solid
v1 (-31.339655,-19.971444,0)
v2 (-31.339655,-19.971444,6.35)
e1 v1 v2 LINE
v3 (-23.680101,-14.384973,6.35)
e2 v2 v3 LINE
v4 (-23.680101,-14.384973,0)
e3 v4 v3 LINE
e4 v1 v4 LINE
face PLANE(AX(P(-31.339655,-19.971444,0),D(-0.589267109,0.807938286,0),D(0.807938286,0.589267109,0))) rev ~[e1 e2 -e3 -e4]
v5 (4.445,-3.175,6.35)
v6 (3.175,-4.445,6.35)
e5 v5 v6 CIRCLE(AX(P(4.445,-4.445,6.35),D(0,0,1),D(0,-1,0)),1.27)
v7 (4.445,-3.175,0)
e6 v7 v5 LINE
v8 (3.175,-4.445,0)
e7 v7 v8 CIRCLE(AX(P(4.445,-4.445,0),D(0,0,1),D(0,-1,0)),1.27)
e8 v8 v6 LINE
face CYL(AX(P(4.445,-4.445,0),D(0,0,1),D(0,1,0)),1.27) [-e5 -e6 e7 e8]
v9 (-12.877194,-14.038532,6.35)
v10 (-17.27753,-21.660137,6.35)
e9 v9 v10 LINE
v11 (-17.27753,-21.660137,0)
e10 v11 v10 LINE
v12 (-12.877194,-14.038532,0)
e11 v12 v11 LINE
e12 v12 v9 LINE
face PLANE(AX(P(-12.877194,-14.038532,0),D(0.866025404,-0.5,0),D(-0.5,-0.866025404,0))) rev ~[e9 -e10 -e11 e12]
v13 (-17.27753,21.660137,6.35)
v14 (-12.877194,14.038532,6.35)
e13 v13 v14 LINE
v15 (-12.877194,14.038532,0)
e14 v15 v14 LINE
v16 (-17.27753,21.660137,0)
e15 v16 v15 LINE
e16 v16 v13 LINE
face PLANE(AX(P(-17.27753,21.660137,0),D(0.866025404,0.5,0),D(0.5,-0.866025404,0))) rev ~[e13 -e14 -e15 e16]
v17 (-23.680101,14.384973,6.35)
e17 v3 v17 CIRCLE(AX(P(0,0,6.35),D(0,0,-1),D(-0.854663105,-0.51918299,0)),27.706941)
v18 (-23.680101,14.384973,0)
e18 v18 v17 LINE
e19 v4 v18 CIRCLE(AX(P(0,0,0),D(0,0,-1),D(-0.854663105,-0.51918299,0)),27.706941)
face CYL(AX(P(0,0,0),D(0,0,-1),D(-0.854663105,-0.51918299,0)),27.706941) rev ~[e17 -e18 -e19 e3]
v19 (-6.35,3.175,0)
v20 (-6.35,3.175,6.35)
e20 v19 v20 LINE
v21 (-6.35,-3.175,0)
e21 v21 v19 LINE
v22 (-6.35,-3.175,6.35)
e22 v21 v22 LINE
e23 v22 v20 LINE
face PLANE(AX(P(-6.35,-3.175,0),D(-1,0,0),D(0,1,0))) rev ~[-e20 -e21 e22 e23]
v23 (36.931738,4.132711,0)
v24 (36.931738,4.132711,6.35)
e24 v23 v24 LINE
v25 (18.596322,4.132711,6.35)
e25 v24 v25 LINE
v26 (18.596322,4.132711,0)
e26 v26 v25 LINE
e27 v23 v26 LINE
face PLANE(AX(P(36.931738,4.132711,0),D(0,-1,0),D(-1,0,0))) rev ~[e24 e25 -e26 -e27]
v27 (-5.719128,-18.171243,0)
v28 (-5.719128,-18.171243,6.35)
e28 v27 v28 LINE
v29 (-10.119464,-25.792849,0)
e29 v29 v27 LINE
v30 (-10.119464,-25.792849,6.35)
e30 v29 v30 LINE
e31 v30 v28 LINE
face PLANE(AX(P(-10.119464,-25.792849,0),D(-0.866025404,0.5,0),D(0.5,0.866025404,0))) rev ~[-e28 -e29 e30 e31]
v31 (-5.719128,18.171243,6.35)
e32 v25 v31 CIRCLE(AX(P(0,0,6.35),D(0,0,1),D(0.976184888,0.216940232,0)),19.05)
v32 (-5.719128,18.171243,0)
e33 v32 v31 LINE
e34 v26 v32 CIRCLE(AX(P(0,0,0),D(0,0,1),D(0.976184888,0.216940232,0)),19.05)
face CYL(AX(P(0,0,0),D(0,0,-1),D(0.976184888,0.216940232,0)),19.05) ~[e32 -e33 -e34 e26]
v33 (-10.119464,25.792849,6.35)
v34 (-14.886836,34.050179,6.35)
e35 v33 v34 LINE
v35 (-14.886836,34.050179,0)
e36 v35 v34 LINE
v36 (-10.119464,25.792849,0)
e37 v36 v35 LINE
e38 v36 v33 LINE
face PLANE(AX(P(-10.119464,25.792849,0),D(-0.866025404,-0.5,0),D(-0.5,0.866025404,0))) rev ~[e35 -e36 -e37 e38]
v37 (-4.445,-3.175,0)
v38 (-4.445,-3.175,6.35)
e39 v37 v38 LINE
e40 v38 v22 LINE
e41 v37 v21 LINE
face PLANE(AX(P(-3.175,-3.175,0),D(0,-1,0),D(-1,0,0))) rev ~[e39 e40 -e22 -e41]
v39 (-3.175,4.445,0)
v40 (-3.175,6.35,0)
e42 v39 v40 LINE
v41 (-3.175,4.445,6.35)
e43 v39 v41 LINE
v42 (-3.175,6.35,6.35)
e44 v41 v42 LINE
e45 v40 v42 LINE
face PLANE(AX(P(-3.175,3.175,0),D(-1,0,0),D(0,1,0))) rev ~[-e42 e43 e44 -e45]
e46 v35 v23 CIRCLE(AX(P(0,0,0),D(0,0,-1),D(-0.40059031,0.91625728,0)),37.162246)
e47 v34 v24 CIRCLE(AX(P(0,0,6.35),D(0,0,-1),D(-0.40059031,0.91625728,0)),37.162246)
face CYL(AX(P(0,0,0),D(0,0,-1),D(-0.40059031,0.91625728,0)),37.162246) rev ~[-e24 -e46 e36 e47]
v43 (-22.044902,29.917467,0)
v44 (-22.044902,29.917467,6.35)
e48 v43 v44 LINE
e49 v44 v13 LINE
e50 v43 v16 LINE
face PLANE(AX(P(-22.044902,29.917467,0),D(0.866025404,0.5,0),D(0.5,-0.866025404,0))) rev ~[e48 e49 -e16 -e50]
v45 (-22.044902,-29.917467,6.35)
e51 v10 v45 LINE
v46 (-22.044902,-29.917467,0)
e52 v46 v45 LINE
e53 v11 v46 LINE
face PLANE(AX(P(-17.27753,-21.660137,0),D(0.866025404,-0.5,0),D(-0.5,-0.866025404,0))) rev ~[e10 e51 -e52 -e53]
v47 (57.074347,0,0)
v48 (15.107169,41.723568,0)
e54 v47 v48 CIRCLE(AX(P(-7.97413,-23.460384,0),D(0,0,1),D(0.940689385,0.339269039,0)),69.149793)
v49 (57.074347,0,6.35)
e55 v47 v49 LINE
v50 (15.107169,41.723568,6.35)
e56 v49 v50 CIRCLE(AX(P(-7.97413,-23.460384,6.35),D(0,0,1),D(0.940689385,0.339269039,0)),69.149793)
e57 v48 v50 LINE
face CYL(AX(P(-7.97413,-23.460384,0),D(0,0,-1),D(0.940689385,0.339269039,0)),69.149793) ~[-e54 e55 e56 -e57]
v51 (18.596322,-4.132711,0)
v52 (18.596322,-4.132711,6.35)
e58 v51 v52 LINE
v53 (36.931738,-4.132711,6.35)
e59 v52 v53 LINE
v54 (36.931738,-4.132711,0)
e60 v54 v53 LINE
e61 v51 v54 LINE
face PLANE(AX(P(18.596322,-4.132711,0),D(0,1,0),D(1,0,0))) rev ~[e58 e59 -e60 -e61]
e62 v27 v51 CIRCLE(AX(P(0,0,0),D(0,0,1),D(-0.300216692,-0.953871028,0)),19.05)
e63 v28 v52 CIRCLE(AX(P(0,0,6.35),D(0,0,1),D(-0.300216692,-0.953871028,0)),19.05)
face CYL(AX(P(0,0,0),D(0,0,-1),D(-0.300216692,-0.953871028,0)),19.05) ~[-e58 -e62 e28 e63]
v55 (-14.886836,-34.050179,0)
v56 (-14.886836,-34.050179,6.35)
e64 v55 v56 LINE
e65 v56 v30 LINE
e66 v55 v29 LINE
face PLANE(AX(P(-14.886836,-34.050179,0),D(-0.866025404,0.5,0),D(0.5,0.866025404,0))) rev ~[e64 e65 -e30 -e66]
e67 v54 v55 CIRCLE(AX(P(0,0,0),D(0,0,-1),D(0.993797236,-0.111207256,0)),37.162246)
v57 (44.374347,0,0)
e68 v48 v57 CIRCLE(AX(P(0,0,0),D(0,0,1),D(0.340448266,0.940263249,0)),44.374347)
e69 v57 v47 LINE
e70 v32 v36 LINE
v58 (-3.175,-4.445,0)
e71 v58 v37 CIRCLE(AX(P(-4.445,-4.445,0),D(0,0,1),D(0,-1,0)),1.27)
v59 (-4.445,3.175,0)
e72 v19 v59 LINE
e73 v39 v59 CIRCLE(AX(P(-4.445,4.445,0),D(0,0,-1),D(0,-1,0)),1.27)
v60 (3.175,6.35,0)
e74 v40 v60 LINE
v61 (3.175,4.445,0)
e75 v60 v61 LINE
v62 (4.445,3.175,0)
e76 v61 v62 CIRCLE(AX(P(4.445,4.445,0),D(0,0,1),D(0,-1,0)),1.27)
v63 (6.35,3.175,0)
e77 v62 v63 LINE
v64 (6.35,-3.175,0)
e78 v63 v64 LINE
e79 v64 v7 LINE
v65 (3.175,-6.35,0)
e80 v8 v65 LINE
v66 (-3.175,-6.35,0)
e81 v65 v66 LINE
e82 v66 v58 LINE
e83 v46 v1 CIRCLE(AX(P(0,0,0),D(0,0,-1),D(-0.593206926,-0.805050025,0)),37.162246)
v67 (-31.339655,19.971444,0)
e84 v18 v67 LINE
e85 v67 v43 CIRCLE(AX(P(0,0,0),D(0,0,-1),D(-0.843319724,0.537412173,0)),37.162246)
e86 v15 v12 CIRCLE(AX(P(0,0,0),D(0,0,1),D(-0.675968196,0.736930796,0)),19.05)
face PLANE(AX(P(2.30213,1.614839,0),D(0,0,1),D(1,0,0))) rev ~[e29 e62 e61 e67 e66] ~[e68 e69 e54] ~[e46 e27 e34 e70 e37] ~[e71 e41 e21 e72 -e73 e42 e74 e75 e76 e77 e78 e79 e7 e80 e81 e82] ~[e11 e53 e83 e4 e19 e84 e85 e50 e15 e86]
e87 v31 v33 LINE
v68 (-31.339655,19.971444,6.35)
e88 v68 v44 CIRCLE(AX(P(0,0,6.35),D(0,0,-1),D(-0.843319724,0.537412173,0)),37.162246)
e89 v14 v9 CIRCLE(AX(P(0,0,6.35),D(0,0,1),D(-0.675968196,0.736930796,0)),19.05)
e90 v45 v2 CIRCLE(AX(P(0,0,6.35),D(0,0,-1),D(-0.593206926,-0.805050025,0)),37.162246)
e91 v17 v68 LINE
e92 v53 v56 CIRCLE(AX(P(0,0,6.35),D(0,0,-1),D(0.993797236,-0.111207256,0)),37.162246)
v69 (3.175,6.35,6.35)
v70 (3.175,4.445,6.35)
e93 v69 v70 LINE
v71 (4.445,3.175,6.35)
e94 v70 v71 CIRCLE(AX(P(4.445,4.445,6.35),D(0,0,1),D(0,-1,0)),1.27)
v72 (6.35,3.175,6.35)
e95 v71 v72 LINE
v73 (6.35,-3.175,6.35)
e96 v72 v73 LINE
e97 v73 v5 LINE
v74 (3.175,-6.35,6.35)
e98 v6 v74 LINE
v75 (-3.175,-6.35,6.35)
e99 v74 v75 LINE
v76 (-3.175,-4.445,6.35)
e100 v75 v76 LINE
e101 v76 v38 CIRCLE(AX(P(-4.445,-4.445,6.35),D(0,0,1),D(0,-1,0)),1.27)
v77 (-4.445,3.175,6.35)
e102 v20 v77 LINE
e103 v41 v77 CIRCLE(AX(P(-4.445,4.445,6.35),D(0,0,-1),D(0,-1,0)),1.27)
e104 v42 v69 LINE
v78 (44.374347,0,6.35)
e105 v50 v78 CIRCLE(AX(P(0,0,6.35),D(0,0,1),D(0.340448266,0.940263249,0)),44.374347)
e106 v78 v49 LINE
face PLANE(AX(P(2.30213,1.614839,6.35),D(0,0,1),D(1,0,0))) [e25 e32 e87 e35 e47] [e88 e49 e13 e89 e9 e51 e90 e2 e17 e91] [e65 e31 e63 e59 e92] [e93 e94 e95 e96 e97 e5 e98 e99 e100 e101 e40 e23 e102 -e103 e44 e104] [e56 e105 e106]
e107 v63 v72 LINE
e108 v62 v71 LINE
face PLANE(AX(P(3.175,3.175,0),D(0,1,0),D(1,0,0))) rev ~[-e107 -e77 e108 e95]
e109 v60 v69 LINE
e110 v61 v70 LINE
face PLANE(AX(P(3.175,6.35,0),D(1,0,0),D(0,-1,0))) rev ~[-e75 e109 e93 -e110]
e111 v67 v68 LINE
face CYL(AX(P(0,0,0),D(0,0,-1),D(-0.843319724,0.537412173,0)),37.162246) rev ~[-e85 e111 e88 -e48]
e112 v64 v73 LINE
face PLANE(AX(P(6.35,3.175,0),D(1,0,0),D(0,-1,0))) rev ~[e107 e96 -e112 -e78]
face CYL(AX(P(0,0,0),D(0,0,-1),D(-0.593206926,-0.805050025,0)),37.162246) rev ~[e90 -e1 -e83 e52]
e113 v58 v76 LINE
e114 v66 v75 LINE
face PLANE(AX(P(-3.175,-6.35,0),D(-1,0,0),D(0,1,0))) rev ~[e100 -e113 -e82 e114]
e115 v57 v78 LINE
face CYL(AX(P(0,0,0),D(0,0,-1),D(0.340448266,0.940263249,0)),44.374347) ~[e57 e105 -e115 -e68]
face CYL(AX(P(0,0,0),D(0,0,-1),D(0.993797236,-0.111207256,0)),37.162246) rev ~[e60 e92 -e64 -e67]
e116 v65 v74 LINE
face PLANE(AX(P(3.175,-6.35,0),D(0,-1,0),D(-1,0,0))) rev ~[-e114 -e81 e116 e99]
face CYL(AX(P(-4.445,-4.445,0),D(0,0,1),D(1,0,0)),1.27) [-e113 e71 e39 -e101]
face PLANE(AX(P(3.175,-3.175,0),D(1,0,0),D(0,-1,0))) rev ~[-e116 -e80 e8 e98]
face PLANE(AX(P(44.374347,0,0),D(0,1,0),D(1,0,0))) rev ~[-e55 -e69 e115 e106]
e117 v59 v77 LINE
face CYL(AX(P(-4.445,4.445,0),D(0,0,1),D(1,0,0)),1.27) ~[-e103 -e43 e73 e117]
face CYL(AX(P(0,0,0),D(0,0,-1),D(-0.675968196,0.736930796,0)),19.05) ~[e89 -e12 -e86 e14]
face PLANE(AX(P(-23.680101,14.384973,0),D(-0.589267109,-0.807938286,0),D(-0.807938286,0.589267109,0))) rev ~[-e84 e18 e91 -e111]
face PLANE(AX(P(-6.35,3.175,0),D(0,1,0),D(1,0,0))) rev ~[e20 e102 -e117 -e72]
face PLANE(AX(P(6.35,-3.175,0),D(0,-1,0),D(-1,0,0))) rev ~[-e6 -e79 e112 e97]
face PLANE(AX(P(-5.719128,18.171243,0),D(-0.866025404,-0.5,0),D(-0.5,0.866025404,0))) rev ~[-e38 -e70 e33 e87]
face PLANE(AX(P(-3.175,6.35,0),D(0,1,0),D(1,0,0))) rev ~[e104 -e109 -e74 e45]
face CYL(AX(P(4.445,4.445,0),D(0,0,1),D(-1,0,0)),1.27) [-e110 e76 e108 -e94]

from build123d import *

# Parameters (mm, degrees)
F1_DEPTH = 6.35
F2_R     = 1.27


with BuildPart() as f1:
    # F0 (on Top) → F1 (new body)
    with BuildSketch(Plane.XY):
        with BuildLine():
            ThreePointArc((15.1071694838, 41.7235677075), (-36.3280432516, -25.4824634909), (44.3743470042, 0))
            ThreePointArc((44.3743470042, 0), (36.3280432516, 25.4824634909), (15.1071694838, 41.7235677075))
        make_face()
        with BuildLine():
            ThreePointArc((-14.8868357383, 34.0501787057), (18.5811231374, 32.1834493357), (36.9317376317, 4.1327114215))
            ThreePointArc((36.9317376317, 4.1327114215), (37.1045743636, 2.0695674625), (37.1622462748, 0))
            ThreePointArc((37.1622462748, 0), (37.1045743636, -2.0695674625), (36.9317376317, -4.1327114215))
            ThreePointArc((36.9317376317, -4.1327114215), (18.5811231374, -32.1834493357), (-14.8868357383, -34.0501787057))
            ThreePointArc((-14.8868357383, -34.0501787057), (-18.5811231374, -32.1834493357), (-22.0449018934, -29.9174672842))
            ThreePointArc((-22.0449018934, -29.9174672842), (-27.1515852785, -25.3736864695), (-31.3396552702, -19.9714435065))
            ThreePointArc((-31.3396552702, -19.9714435065), (-37.1622462748, 0), (-31.3396552702, 19.9714435065))
            ThreePointArc((-31.3396552702, 19.9714435065), (-27.1515852785, 25.3736864695), (-22.0449018934, 29.9174672842))
            ThreePointArc((-22.0449018934, 29.9174672842), (-18.5811231374, 32.1834493357), (-14.8868357383, 34.0501787057))
        make_face(mode=Mode.SUBTRACT)
        with BuildLine():
            ThreePointArc((15.1071694838, 41.7235677075), (36.3280432516, 25.4824634909), (44.3743470042, 0))
            Line((44.3743470042, 0), (57.0743470042, 0))
            ThreePointArc((57.0743470042, 0), (40.7796227308, 25.5780250359), (15.1071694838, 41.7235677075))
        make_face()
        with BuildLine():
            ThreePointArc((-9.525, 16.4977839421), (-7.6678534057, 17.4386502961), (-5.7191279813, 18.1712430817))
            Line((-5.7191279813, 18.1712430817), (-10.11946405, 25.792848723))
            ThreePointArc((-10.11946405, 25.792848723), (-13.8534706654, 23.9949150536), (-17.2775302051, 21.6601373015))
            Line((-17.2775302051, 21.6601373015), (-12.8771941364, 14.0385316602))
            ThreePointArc((-12.8771941364, 14.0385316602), (-11.2683874613, 15.3598809898), (-9.525, 16.4977839421))
        make_face()
        with BuildLine():
            ThreePointArc((-17.2775302051, 21.6601373015), (-13.8534706654, 23.9949150536), (-10.11946405, 25.792848723))
            Line((-10.11946405, 25.792848723), (-14.8868357383, 34.0501787057))
            ThreePointArc((-14.8868357383, 34.0501787057), (-18.5811231374, 32.1834493357), (-22.0449018934, 29.9174672842))
            Line((-22.0449018934, 29.9174672842), (-17.2775302051, 21.6601373015))
        make_face()
        with BuildLine():
            Line((-10.11946405, -25.792848723), (-5.7191279813, -18.1712430817))
            ThreePointArc((-5.7191279813, -18.1712430817), (-7.6678534057, -17.4386502961), (-9.525, -16.4977839421))
            ThreePointArc((-9.525, -16.4977839421), (-11.2683874613, -15.3598809898), (-12.8771941364, -14.0385316602))
            Line((-12.8771941364, -14.0385316602), (-17.2775302051, -21.6601373015))
            ThreePointArc((-17.2775302051, -21.6601373015), (-13.8534706654, -23.9949150536), (-10.11946405, -25.792848723))
        make_face()
        with BuildLine():
            Line((-14.8868357383, -34.0501787057), (-10.11946405, -25.792848723))
            ThreePointArc((-10.11946405, -25.792848723), (-13.8534706654, -23.9949150536), (-17.2775302051, -21.6601373015))
            Line((-17.2775302051, -21.6601373015), (-22.0449018934, -29.9174672842))
            ThreePointArc((-22.0449018934, -29.9174672842), (-18.5811231374, -32.1834493357), (-14.8868357383, -34.0501787057))
        make_face()
        with BuildLine():
            ThreePointArc((18.5963221177, 4.1327114215), (18.936240867, 2.0787693062), (19.05, 0))
            ThreePointArc((19.05, 0), (18.936240867, -2.0787693062), (18.5963221177, -4.1327114215))
            Line((18.5963221177, -4.1327114215), (27.3969942551, -4.1327114215))
            ThreePointArc((27.3969942551, -4.1327114215), (27.6293459059, -2.0721589516), (27.7069413308, 0))
            ThreePointArc((27.7069413308, 0), (27.6293459059, 2.0721589516), (27.3969942551, 4.1327114215))
            Line((27.3969942551, 4.1327114215), (18.5963221177, 4.1327114215))
        make_face()
        with BuildLine():
            Line((36.9317376317, 4.1327114215), (27.3969942551, 4.1327114215))
            ThreePointArc((27.3969942551, 4.1327114215), (27.6293459059, 2.0721589516), (27.7069413308, 0))
            ThreePointArc((27.7069413308, 0), (27.6293459059, -2.0721589516), (27.3969942551, -4.1327114215))
            Line((27.3969942551, -4.1327114215), (36.9317376317, -4.1327114215))
            ThreePointArc((36.9317376317, -4.1327114215), (37.1045743636, -2.0695674625), (37.1622462748, 0))
            ThreePointArc((37.1622462748, 0), (37.1045743636, 2.0695674625), (36.9317376317, 4.1327114215))
        make_face()
        with BuildLine():
            ThreePointArc((18.5963221177, -4.1327114215), (18.936240867, -2.0787693062), (19.05, 0))
            ThreePointArc((19.05, 0), (18.936240867, 2.0787693062), (18.5963221177, 4.1327114215))
            ThreePointArc((18.5963221177, 4.1327114215), (9.525, 16.4977839421), (-5.7191279813, 18.1712430817))
            ThreePointArc((-5.7191279813, 18.1712430817), (-7.6678534057, 17.4386502961), (-9.525, 16.4977839421))
            ThreePointArc((-9.525, 16.4977839421), (-11.2683874613, 15.3598809898), (-12.8771941364, 14.0385316602))
            ThreePointArc((-12.8771941364, 14.0385316602), (-19.05, 0), (-12.8771941364, -14.0385316602))
            ThreePointArc((-12.8771941364, -14.0385316602), (-11.2683874613, -15.3598809898), (-9.525, -16.4977839421))
            ThreePointArc((-9.525, -16.4977839421), (-7.6678534057, -17.4386502961), (-5.7191279813, -18.1712430817))
            ThreePointArc((-5.7191279813, -18.1712430817), (9.525, -16.4977839421), (18.5963221177, -4.1327114215))
        make_face()
        Polygon((-3.175, 6.35), (3.175, 6.35), (3.175, 3.175), (6.35, 3.175), (6.35, -3.175), (3.175, -3.175), (3.175, -6.35), (-3.175, -6.35), (-3.175, -3.175), (-6.35, -3.175), (-6.35, 3.175), (-3.175, 3.175), align=None, mode=Mode.SUBTRACT)
        with BuildLine():
            ThreePointArc((-23.6801005032, -14.3849726474), (-27.7069413308, 0), (-23.6801005032, 14.3849726474))
            Line((-23.6801005032, 14.3849726474), (-31.3396552702, 19.9714435065))
            ThreePointArc((-31.3396552702, 19.9714435065), (-37.1622462748, 0), (-31.3396552702, -19.9714435065))
            Line((-31.3396552702, -19.9714435065), (-23.6801005032, -14.3849726474))
        make_face()
    extrude(amount=F1_DEPTH)

    # F2
    f2_edges = [f1.edges().sort_by_distance(p)[0] for p in [
        (-3.175, 3.175, 3.175),
        (-3.175, -3.175, 3.175),
        (3.175, -3.175, 3.175),
        (3.175, 3.175, 3.175),
    ]]
    fillet(f2_edges, radius=F2_R)


solid = f1.part
